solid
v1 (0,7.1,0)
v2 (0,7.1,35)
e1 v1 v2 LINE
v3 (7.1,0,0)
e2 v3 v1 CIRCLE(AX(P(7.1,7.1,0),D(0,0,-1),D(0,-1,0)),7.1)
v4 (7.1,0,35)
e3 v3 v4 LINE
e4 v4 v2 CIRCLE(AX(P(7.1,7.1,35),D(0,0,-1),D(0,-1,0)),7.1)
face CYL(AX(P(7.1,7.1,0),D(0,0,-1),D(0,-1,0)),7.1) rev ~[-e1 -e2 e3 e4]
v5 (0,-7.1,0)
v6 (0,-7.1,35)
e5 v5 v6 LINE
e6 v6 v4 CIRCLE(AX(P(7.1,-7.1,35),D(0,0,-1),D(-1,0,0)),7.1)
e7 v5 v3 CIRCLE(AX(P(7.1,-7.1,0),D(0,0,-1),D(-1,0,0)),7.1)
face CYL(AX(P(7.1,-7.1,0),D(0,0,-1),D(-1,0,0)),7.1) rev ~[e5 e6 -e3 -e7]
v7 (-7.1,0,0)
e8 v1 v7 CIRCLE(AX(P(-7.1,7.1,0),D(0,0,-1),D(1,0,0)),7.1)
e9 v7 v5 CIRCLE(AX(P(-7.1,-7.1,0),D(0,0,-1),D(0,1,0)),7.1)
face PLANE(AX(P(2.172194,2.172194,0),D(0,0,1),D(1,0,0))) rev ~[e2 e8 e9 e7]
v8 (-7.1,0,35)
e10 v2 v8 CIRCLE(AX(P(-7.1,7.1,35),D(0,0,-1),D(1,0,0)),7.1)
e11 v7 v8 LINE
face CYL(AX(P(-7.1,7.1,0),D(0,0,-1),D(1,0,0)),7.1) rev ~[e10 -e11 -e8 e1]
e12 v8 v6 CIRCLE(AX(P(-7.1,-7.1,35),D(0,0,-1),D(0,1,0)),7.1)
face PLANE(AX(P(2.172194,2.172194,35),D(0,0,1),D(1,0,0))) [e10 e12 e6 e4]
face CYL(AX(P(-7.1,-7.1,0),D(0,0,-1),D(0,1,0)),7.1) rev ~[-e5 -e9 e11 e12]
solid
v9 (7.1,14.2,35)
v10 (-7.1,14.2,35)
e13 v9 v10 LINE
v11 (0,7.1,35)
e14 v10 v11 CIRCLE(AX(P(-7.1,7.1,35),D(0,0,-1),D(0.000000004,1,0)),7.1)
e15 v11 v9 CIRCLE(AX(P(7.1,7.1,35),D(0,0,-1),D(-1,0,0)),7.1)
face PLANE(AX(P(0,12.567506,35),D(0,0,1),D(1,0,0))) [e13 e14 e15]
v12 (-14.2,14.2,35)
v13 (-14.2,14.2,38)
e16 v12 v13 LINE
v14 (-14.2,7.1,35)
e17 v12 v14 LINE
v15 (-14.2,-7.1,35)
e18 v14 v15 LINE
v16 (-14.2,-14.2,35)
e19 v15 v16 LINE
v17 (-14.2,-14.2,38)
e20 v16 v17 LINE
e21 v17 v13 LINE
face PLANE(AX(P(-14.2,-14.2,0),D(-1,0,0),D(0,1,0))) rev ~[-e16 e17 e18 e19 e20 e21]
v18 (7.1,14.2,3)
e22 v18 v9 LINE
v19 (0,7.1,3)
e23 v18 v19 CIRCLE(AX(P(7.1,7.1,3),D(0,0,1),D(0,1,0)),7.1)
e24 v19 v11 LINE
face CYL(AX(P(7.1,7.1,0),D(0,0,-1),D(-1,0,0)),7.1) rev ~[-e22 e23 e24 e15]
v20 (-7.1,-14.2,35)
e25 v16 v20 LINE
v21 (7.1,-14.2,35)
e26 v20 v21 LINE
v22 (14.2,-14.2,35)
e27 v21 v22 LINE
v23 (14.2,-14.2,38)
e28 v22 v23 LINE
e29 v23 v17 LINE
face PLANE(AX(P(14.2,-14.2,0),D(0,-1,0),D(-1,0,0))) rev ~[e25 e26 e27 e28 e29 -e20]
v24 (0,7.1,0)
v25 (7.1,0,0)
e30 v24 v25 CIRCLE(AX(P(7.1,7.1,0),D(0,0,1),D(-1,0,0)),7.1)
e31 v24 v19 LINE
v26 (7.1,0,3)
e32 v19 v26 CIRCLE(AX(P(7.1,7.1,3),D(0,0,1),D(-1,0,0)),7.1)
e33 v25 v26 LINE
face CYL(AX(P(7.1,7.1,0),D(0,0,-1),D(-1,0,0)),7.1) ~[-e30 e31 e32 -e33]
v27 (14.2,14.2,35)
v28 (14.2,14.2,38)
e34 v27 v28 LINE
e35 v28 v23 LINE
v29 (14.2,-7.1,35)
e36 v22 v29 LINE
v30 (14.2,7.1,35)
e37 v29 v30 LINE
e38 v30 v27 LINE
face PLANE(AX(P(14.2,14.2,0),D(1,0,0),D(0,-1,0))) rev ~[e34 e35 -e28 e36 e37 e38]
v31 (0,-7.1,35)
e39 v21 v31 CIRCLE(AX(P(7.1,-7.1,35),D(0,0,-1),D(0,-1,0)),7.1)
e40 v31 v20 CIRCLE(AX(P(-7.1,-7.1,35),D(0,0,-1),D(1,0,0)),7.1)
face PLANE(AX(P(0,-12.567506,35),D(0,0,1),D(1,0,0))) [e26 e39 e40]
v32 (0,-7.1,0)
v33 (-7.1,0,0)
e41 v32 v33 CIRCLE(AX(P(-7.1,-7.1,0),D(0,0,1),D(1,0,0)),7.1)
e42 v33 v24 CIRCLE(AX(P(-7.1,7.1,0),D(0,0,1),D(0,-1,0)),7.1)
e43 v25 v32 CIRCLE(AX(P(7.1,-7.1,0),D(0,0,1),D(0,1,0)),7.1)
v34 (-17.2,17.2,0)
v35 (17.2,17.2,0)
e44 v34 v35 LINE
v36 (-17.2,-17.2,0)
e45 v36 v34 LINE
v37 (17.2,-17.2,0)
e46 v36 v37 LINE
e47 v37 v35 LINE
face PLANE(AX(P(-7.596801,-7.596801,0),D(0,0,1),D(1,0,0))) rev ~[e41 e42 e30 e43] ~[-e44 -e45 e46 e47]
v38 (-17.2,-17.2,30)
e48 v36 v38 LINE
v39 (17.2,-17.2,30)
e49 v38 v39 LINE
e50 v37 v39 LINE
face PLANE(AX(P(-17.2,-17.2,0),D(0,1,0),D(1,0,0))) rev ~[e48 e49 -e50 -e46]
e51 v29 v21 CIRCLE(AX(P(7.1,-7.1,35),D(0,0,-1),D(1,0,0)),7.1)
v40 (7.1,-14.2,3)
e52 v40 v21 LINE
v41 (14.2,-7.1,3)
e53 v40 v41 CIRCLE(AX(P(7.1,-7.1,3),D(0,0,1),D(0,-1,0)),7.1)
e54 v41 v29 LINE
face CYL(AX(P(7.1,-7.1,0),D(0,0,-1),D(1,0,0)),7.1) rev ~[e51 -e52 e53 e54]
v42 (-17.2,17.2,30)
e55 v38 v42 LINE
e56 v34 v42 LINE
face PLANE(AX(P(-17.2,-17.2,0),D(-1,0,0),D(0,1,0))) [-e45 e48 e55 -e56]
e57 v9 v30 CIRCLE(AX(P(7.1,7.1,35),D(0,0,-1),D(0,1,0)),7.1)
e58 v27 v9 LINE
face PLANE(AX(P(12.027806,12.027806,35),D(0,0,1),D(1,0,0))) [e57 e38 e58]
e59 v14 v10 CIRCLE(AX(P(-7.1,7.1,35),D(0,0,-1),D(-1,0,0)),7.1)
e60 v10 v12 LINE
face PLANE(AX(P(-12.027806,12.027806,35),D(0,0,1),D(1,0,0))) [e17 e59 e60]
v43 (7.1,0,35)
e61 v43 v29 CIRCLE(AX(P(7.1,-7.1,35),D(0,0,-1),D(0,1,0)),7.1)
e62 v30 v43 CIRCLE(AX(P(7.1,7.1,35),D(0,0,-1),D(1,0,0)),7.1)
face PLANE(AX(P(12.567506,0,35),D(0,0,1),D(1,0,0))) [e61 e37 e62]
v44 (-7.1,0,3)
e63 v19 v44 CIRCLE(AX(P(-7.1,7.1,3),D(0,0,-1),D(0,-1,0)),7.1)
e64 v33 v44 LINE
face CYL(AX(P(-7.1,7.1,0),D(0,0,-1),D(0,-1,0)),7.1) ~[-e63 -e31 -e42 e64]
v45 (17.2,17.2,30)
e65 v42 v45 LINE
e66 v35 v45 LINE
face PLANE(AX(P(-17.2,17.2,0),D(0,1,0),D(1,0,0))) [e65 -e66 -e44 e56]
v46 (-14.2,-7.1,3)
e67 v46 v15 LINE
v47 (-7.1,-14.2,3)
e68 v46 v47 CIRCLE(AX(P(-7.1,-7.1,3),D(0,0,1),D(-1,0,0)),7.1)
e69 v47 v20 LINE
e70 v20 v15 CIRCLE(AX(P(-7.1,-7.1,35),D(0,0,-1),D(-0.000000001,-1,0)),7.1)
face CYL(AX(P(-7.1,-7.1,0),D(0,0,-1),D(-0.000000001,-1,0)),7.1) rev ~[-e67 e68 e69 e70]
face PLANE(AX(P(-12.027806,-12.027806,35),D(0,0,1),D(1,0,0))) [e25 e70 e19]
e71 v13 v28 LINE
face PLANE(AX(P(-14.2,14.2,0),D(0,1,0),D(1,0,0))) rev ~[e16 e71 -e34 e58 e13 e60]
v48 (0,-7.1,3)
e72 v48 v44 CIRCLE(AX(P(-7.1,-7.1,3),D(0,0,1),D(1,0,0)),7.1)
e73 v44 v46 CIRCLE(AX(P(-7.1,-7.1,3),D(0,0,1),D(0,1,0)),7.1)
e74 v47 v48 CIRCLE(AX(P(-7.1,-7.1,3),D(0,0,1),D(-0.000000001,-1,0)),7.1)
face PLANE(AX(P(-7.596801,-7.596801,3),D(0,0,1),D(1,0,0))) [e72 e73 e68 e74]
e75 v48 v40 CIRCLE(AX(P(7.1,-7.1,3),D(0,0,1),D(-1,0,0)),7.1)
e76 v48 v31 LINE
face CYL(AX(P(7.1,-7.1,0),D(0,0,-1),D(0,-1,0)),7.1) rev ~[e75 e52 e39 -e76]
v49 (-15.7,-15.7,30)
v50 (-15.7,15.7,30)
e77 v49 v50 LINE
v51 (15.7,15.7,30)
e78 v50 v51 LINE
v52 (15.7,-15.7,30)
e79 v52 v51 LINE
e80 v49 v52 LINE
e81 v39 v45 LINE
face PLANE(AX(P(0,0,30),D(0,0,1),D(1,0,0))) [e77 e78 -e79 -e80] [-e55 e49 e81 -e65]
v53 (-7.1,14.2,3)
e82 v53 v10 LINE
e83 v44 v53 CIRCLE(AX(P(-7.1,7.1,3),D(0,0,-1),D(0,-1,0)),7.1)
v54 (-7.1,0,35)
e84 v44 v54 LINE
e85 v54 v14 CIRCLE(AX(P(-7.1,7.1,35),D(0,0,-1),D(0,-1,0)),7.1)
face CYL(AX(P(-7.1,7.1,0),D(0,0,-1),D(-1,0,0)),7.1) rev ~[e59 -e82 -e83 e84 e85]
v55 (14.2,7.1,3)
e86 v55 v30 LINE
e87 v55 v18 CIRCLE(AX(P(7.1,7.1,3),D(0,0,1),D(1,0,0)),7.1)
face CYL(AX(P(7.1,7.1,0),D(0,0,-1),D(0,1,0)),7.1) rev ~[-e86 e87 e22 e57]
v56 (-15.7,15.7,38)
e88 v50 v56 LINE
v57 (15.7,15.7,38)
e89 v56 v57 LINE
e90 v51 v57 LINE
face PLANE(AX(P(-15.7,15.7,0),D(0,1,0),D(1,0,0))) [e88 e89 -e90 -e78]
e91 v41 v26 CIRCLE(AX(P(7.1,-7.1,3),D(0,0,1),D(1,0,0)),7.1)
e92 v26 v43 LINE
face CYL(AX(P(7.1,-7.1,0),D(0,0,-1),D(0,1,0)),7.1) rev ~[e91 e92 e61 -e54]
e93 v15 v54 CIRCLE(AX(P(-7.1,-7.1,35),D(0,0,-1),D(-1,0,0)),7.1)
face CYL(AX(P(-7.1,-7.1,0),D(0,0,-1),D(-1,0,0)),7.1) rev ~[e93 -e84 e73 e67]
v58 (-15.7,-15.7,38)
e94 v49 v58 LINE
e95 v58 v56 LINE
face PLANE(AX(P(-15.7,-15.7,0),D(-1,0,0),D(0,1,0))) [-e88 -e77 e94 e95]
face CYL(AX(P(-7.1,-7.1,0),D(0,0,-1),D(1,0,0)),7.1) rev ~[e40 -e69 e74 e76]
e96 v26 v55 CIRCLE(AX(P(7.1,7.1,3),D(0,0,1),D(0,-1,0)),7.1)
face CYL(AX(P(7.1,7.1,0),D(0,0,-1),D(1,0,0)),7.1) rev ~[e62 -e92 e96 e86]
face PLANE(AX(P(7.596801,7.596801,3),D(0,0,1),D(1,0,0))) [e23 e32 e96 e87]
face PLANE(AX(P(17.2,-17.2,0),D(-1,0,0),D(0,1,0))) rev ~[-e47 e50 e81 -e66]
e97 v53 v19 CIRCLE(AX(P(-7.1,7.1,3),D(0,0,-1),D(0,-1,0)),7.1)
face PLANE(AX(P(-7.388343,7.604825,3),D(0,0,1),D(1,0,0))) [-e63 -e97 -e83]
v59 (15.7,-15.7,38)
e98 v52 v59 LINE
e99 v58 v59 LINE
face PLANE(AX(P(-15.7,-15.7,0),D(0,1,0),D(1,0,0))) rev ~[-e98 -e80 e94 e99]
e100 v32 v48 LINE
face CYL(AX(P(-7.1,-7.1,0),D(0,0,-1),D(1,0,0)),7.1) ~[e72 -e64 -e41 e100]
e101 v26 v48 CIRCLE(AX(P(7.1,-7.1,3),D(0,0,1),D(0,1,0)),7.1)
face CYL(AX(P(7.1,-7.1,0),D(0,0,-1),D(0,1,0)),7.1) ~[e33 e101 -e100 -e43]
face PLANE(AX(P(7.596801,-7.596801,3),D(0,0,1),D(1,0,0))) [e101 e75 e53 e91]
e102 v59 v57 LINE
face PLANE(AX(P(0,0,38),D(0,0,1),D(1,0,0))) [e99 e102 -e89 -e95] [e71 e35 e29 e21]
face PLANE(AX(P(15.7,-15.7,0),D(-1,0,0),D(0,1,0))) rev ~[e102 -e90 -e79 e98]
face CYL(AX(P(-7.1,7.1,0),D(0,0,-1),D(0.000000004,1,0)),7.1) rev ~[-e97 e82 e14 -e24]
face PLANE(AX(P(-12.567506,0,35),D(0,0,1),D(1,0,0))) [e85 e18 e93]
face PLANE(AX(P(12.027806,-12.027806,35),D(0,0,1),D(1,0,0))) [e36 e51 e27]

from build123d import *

# Parameters (mm, degrees)
F0_W     = 31.4
F0_H     = 31.4
F1_DEPTH = 38
F0_W_2   = 34.4
F0_H_2   = 34.4
F2_DEPTH = 30
F3_DEPTH = 35
F4_DEPTH = 3


with BuildPart() as f1:
    # F0 (on Top) → F1 (new body)
    with BuildSketch(Plane.XY):
        Rectangle(F0_W, F0_H)
        Polygon((7.1, 14.2), (14.2, 14.2), (14.2, 7.1), (14.2, -7.1), (14.2, -14.2), (7.1, -14.2), (-7.1000000056, -14.2), (-14.2, -14.2), (-14.2, -7.1), (-14.2, 7.1), (-14.2, 14.2), (-7.0999999722, 14.2), align=None, mode=Mode.SUBTRACT)
    extrude(amount=F1_DEPTH)

    # F0 (on Top) → F2 (join)
    with BuildSketch(Plane.XY):
        Rectangle(F0_W_2, F0_H_2)
        Rectangle(F0_W, F0_H, mode=Mode.SUBTRACT)
    extrude(amount=F2_DEPTH)

    # F0 (on Top) → F3, piece 2 (join)
    with BuildSketch(Plane.XY):
        with BuildLine():
            ThreePointArc((-14.2, 7.1), (-12.1204581366, 12.1204581563), (-7.0999999722, 14.2))
            Line((-7.0999999722, 14.2), (-14.2, 14.2))
            Line((-14.2, 14.2), (-14.2, 7.1))
        make_face()
        with BuildLine():
            ThreePointArc((0, 7.1), (2.0795418536, 12.1204581464), (7.1, 14.2))
            Line((7.1, 14.2), (-7.0999999722, 14.2))
            ThreePointArc((-7.0999999722, 14.2), (-2.0795418437, 12.1204581366), (0, 7.1))
        make_face()
        with BuildLine():
            Line((14.2, 7.1), (14.2, 14.2))
            Line((14.2, 14.2), (7.1, 14.2))
            ThreePointArc((7.1, 14.2), (12.1204581464, 12.1204581464), (14.2, 7.1))
        make_face()
        with BuildLine():
            Line((14.2, -7.1), (14.2, 7.1))
            ThreePointArc((14.2, 7.1), (12.1204581464, 2.0795418536), (7.1, 0))
            ThreePointArc((7.1, 0), (12.1204581464, -2.0795418536), (14.2, -7.1))
        make_face()
        with BuildLine():
            ThreePointArc((-7.1, 0), (-12.1204581464, 2.0795418536), (-14.2, 7.1))
            Line((-14.2, 7.1), (-14.2, -7.1))
            ThreePointArc((-14.2, -7.1), (-12.1204581464, -2.0795418536), (-7.1, 0))
        make_face()
        with BuildLine():
            ThreePointArc((-7.1000000056, -14.2), (-12.1204581484, -12.1204581444), (-14.2, -7.1))
            Line((-14.2, -7.1), (-14.2, -14.2))
            Line((-14.2, -14.2), (-7.1000000056, -14.2))
        make_face()
        with BuildLine():
            Line((-7.1000000056, -14.2), (7.1, -14.2))
            ThreePointArc((7.1, -14.2), (2.0795418536, -12.1204581464), (0, -7.1))
            ThreePointArc((0, -7.1), (-2.0795418556, -12.1204581484), (-7.1000000056, -14.2))
        make_face()
        with BuildLine():
            Line((14.2, -14.2), (14.2, -7.1))
            ThreePointArc((14.2, -7.1), (12.1204581464, -12.1204581464), (7.1, -14.2))
            Line((7.1, -14.2), (14.2, -14.2))
        make_face()
    extrude(amount=F3_DEPTH)

    # F0 (on Top) → F4 (join)
    with BuildSketch(Plane.XY):
        with BuildLine():
            Line((-7.1, -7.1), (-7.1, 0))
            ThreePointArc((-7.1, 0), (-12.1204581464, -2.0795418536), (-14.2, -7.1))
            ThreePointArc((-14.2, -7.1), (-12.1204581484, -12.1204581444), (-7.1000000056, -14.2))
            ThreePointArc((-7.1000000056, -14.2), (-2.0795418556, -12.1204581484), (0, -7.1))
            Line((0, -7.1), (-7.1, -7.1))
        make_face()
        with BuildLine():
            ThreePointArc((0, 7.1), (-2.0795418437, 12.1204581366), (-7.0999999722, 14.2))
            ThreePointArc((-7.0999999722, 14.2), (-12.1204581366, 12.1204581563), (-14.2, 7.1))
            ThreePointArc((-14.2, 7.1), (-12.1204581464, 2.0795418536), (-7.1, 0))
            Line((-7.1, 0), (-7.1, 7.1))
            Line((-7.1, 7.1), (0, 7.1))
        make_face()
        with BuildLine():
            ThreePointArc((0, -7.1), (-2.0795418536, -2.0795418536), (-7.1, 0))
            Line((-7.1, 0), (-7.1, -7.1))
            Line((-7.1, -7.1), (0, -7.1))
        make_face()
        with BuildLine():
            ThreePointArc((-7.1, 0), (-2.0795418536, 2.0795418536), (0, 7.1))
            Line((0, 7.1), (-7.1, 7.1))
            Line((-7.1, 7.1), (-7.1, 0))
        make_face()
        with BuildLine():
            ThreePointArc((7.1, -14.2), (12.1204581464, -12.1204581464), (14.2, -7.1))
            ThreePointArc((14.2, -7.1), (12.1204581464, -2.0795418536), (7.1, 0))
            Line((7.1, 0), (7.1, -7.1))
            Line((7.1, -7.1), (0, -7.1))
            ThreePointArc((0, -7.1), (2.0795418536, -12.1204581464), (7.1, -14.2))
        make_face()
        with BuildLine():
            Line((7.1, -7.1), (7.1, 0))
            ThreePointArc((7.1, 0), (2.0795418536, -2.0795418536), (0, -7.1))
            Line((0, -7.1), (7.1, -7.1))
        make_face()
        with BuildLine():
            ThreePointArc((14.2, 7.1), (12.1204581464, 12.1204581464), (7.1, 14.2))
            ThreePointArc((7.1, 14.2), (2.0795418536, 12.1204581464), (0, 7.1))
            Line((0, 7.1), (7.1, 7.1))
            Line((7.1, 7.1), (7.1, 0))
            ThreePointArc((7.1, 0), (12.1204581464, 2.0795418536), (14.2, 7.1))
        make_face()
        with BuildLine():
            Line((7.1, 7.1), (0, 7.1))
            ThreePointArc((0, 7.1), (2.0795418536, 2.0795418536), (7.1, 0))
            Line((7.1, 0), (7.1, 7.1))
        make_face()
    extrude(amount=F4_DEPTH)


with BuildPart() as f3:
    # F0 (on Top) → F3 (new body)
    with BuildSketch(Plane.XY):
        with BuildLine():
            ThreePointArc((7.1, 0), (2.0795418536, 2.0795418536), (0, 7.1))
            Line((0, 7.1), (0, 0))
            Line((0, 0), (7.1, 0))
        make_face()
        with BuildLine():
            Line((0, 0), (0, 7.1))
            ThreePointArc((0, 7.1), (-2.0795418536, 2.0795418536), (-7.1, 0))
            Line((-7.1, 0), (0, 0))
        make_face()
        with BuildLine():
            Line((0, -7.1), (0, 0))
            Line((0, 0), (-7.1, 0))
            ThreePointArc((-7.1, 0), (-2.0795418536, -2.0795418536), (0, -7.1))
        make_face()
        with BuildLine():
            ThreePointArc((0, -7.1), (2.0795418536, -2.0795418536), (7.1, 0))
            Line((7.1, 0), (0, 0))
            Line((0, 0), (0, -7.1))
        make_face()
    extrude(amount=F3_DEPTH)


solid = Compound([f1.part, f3.part])
